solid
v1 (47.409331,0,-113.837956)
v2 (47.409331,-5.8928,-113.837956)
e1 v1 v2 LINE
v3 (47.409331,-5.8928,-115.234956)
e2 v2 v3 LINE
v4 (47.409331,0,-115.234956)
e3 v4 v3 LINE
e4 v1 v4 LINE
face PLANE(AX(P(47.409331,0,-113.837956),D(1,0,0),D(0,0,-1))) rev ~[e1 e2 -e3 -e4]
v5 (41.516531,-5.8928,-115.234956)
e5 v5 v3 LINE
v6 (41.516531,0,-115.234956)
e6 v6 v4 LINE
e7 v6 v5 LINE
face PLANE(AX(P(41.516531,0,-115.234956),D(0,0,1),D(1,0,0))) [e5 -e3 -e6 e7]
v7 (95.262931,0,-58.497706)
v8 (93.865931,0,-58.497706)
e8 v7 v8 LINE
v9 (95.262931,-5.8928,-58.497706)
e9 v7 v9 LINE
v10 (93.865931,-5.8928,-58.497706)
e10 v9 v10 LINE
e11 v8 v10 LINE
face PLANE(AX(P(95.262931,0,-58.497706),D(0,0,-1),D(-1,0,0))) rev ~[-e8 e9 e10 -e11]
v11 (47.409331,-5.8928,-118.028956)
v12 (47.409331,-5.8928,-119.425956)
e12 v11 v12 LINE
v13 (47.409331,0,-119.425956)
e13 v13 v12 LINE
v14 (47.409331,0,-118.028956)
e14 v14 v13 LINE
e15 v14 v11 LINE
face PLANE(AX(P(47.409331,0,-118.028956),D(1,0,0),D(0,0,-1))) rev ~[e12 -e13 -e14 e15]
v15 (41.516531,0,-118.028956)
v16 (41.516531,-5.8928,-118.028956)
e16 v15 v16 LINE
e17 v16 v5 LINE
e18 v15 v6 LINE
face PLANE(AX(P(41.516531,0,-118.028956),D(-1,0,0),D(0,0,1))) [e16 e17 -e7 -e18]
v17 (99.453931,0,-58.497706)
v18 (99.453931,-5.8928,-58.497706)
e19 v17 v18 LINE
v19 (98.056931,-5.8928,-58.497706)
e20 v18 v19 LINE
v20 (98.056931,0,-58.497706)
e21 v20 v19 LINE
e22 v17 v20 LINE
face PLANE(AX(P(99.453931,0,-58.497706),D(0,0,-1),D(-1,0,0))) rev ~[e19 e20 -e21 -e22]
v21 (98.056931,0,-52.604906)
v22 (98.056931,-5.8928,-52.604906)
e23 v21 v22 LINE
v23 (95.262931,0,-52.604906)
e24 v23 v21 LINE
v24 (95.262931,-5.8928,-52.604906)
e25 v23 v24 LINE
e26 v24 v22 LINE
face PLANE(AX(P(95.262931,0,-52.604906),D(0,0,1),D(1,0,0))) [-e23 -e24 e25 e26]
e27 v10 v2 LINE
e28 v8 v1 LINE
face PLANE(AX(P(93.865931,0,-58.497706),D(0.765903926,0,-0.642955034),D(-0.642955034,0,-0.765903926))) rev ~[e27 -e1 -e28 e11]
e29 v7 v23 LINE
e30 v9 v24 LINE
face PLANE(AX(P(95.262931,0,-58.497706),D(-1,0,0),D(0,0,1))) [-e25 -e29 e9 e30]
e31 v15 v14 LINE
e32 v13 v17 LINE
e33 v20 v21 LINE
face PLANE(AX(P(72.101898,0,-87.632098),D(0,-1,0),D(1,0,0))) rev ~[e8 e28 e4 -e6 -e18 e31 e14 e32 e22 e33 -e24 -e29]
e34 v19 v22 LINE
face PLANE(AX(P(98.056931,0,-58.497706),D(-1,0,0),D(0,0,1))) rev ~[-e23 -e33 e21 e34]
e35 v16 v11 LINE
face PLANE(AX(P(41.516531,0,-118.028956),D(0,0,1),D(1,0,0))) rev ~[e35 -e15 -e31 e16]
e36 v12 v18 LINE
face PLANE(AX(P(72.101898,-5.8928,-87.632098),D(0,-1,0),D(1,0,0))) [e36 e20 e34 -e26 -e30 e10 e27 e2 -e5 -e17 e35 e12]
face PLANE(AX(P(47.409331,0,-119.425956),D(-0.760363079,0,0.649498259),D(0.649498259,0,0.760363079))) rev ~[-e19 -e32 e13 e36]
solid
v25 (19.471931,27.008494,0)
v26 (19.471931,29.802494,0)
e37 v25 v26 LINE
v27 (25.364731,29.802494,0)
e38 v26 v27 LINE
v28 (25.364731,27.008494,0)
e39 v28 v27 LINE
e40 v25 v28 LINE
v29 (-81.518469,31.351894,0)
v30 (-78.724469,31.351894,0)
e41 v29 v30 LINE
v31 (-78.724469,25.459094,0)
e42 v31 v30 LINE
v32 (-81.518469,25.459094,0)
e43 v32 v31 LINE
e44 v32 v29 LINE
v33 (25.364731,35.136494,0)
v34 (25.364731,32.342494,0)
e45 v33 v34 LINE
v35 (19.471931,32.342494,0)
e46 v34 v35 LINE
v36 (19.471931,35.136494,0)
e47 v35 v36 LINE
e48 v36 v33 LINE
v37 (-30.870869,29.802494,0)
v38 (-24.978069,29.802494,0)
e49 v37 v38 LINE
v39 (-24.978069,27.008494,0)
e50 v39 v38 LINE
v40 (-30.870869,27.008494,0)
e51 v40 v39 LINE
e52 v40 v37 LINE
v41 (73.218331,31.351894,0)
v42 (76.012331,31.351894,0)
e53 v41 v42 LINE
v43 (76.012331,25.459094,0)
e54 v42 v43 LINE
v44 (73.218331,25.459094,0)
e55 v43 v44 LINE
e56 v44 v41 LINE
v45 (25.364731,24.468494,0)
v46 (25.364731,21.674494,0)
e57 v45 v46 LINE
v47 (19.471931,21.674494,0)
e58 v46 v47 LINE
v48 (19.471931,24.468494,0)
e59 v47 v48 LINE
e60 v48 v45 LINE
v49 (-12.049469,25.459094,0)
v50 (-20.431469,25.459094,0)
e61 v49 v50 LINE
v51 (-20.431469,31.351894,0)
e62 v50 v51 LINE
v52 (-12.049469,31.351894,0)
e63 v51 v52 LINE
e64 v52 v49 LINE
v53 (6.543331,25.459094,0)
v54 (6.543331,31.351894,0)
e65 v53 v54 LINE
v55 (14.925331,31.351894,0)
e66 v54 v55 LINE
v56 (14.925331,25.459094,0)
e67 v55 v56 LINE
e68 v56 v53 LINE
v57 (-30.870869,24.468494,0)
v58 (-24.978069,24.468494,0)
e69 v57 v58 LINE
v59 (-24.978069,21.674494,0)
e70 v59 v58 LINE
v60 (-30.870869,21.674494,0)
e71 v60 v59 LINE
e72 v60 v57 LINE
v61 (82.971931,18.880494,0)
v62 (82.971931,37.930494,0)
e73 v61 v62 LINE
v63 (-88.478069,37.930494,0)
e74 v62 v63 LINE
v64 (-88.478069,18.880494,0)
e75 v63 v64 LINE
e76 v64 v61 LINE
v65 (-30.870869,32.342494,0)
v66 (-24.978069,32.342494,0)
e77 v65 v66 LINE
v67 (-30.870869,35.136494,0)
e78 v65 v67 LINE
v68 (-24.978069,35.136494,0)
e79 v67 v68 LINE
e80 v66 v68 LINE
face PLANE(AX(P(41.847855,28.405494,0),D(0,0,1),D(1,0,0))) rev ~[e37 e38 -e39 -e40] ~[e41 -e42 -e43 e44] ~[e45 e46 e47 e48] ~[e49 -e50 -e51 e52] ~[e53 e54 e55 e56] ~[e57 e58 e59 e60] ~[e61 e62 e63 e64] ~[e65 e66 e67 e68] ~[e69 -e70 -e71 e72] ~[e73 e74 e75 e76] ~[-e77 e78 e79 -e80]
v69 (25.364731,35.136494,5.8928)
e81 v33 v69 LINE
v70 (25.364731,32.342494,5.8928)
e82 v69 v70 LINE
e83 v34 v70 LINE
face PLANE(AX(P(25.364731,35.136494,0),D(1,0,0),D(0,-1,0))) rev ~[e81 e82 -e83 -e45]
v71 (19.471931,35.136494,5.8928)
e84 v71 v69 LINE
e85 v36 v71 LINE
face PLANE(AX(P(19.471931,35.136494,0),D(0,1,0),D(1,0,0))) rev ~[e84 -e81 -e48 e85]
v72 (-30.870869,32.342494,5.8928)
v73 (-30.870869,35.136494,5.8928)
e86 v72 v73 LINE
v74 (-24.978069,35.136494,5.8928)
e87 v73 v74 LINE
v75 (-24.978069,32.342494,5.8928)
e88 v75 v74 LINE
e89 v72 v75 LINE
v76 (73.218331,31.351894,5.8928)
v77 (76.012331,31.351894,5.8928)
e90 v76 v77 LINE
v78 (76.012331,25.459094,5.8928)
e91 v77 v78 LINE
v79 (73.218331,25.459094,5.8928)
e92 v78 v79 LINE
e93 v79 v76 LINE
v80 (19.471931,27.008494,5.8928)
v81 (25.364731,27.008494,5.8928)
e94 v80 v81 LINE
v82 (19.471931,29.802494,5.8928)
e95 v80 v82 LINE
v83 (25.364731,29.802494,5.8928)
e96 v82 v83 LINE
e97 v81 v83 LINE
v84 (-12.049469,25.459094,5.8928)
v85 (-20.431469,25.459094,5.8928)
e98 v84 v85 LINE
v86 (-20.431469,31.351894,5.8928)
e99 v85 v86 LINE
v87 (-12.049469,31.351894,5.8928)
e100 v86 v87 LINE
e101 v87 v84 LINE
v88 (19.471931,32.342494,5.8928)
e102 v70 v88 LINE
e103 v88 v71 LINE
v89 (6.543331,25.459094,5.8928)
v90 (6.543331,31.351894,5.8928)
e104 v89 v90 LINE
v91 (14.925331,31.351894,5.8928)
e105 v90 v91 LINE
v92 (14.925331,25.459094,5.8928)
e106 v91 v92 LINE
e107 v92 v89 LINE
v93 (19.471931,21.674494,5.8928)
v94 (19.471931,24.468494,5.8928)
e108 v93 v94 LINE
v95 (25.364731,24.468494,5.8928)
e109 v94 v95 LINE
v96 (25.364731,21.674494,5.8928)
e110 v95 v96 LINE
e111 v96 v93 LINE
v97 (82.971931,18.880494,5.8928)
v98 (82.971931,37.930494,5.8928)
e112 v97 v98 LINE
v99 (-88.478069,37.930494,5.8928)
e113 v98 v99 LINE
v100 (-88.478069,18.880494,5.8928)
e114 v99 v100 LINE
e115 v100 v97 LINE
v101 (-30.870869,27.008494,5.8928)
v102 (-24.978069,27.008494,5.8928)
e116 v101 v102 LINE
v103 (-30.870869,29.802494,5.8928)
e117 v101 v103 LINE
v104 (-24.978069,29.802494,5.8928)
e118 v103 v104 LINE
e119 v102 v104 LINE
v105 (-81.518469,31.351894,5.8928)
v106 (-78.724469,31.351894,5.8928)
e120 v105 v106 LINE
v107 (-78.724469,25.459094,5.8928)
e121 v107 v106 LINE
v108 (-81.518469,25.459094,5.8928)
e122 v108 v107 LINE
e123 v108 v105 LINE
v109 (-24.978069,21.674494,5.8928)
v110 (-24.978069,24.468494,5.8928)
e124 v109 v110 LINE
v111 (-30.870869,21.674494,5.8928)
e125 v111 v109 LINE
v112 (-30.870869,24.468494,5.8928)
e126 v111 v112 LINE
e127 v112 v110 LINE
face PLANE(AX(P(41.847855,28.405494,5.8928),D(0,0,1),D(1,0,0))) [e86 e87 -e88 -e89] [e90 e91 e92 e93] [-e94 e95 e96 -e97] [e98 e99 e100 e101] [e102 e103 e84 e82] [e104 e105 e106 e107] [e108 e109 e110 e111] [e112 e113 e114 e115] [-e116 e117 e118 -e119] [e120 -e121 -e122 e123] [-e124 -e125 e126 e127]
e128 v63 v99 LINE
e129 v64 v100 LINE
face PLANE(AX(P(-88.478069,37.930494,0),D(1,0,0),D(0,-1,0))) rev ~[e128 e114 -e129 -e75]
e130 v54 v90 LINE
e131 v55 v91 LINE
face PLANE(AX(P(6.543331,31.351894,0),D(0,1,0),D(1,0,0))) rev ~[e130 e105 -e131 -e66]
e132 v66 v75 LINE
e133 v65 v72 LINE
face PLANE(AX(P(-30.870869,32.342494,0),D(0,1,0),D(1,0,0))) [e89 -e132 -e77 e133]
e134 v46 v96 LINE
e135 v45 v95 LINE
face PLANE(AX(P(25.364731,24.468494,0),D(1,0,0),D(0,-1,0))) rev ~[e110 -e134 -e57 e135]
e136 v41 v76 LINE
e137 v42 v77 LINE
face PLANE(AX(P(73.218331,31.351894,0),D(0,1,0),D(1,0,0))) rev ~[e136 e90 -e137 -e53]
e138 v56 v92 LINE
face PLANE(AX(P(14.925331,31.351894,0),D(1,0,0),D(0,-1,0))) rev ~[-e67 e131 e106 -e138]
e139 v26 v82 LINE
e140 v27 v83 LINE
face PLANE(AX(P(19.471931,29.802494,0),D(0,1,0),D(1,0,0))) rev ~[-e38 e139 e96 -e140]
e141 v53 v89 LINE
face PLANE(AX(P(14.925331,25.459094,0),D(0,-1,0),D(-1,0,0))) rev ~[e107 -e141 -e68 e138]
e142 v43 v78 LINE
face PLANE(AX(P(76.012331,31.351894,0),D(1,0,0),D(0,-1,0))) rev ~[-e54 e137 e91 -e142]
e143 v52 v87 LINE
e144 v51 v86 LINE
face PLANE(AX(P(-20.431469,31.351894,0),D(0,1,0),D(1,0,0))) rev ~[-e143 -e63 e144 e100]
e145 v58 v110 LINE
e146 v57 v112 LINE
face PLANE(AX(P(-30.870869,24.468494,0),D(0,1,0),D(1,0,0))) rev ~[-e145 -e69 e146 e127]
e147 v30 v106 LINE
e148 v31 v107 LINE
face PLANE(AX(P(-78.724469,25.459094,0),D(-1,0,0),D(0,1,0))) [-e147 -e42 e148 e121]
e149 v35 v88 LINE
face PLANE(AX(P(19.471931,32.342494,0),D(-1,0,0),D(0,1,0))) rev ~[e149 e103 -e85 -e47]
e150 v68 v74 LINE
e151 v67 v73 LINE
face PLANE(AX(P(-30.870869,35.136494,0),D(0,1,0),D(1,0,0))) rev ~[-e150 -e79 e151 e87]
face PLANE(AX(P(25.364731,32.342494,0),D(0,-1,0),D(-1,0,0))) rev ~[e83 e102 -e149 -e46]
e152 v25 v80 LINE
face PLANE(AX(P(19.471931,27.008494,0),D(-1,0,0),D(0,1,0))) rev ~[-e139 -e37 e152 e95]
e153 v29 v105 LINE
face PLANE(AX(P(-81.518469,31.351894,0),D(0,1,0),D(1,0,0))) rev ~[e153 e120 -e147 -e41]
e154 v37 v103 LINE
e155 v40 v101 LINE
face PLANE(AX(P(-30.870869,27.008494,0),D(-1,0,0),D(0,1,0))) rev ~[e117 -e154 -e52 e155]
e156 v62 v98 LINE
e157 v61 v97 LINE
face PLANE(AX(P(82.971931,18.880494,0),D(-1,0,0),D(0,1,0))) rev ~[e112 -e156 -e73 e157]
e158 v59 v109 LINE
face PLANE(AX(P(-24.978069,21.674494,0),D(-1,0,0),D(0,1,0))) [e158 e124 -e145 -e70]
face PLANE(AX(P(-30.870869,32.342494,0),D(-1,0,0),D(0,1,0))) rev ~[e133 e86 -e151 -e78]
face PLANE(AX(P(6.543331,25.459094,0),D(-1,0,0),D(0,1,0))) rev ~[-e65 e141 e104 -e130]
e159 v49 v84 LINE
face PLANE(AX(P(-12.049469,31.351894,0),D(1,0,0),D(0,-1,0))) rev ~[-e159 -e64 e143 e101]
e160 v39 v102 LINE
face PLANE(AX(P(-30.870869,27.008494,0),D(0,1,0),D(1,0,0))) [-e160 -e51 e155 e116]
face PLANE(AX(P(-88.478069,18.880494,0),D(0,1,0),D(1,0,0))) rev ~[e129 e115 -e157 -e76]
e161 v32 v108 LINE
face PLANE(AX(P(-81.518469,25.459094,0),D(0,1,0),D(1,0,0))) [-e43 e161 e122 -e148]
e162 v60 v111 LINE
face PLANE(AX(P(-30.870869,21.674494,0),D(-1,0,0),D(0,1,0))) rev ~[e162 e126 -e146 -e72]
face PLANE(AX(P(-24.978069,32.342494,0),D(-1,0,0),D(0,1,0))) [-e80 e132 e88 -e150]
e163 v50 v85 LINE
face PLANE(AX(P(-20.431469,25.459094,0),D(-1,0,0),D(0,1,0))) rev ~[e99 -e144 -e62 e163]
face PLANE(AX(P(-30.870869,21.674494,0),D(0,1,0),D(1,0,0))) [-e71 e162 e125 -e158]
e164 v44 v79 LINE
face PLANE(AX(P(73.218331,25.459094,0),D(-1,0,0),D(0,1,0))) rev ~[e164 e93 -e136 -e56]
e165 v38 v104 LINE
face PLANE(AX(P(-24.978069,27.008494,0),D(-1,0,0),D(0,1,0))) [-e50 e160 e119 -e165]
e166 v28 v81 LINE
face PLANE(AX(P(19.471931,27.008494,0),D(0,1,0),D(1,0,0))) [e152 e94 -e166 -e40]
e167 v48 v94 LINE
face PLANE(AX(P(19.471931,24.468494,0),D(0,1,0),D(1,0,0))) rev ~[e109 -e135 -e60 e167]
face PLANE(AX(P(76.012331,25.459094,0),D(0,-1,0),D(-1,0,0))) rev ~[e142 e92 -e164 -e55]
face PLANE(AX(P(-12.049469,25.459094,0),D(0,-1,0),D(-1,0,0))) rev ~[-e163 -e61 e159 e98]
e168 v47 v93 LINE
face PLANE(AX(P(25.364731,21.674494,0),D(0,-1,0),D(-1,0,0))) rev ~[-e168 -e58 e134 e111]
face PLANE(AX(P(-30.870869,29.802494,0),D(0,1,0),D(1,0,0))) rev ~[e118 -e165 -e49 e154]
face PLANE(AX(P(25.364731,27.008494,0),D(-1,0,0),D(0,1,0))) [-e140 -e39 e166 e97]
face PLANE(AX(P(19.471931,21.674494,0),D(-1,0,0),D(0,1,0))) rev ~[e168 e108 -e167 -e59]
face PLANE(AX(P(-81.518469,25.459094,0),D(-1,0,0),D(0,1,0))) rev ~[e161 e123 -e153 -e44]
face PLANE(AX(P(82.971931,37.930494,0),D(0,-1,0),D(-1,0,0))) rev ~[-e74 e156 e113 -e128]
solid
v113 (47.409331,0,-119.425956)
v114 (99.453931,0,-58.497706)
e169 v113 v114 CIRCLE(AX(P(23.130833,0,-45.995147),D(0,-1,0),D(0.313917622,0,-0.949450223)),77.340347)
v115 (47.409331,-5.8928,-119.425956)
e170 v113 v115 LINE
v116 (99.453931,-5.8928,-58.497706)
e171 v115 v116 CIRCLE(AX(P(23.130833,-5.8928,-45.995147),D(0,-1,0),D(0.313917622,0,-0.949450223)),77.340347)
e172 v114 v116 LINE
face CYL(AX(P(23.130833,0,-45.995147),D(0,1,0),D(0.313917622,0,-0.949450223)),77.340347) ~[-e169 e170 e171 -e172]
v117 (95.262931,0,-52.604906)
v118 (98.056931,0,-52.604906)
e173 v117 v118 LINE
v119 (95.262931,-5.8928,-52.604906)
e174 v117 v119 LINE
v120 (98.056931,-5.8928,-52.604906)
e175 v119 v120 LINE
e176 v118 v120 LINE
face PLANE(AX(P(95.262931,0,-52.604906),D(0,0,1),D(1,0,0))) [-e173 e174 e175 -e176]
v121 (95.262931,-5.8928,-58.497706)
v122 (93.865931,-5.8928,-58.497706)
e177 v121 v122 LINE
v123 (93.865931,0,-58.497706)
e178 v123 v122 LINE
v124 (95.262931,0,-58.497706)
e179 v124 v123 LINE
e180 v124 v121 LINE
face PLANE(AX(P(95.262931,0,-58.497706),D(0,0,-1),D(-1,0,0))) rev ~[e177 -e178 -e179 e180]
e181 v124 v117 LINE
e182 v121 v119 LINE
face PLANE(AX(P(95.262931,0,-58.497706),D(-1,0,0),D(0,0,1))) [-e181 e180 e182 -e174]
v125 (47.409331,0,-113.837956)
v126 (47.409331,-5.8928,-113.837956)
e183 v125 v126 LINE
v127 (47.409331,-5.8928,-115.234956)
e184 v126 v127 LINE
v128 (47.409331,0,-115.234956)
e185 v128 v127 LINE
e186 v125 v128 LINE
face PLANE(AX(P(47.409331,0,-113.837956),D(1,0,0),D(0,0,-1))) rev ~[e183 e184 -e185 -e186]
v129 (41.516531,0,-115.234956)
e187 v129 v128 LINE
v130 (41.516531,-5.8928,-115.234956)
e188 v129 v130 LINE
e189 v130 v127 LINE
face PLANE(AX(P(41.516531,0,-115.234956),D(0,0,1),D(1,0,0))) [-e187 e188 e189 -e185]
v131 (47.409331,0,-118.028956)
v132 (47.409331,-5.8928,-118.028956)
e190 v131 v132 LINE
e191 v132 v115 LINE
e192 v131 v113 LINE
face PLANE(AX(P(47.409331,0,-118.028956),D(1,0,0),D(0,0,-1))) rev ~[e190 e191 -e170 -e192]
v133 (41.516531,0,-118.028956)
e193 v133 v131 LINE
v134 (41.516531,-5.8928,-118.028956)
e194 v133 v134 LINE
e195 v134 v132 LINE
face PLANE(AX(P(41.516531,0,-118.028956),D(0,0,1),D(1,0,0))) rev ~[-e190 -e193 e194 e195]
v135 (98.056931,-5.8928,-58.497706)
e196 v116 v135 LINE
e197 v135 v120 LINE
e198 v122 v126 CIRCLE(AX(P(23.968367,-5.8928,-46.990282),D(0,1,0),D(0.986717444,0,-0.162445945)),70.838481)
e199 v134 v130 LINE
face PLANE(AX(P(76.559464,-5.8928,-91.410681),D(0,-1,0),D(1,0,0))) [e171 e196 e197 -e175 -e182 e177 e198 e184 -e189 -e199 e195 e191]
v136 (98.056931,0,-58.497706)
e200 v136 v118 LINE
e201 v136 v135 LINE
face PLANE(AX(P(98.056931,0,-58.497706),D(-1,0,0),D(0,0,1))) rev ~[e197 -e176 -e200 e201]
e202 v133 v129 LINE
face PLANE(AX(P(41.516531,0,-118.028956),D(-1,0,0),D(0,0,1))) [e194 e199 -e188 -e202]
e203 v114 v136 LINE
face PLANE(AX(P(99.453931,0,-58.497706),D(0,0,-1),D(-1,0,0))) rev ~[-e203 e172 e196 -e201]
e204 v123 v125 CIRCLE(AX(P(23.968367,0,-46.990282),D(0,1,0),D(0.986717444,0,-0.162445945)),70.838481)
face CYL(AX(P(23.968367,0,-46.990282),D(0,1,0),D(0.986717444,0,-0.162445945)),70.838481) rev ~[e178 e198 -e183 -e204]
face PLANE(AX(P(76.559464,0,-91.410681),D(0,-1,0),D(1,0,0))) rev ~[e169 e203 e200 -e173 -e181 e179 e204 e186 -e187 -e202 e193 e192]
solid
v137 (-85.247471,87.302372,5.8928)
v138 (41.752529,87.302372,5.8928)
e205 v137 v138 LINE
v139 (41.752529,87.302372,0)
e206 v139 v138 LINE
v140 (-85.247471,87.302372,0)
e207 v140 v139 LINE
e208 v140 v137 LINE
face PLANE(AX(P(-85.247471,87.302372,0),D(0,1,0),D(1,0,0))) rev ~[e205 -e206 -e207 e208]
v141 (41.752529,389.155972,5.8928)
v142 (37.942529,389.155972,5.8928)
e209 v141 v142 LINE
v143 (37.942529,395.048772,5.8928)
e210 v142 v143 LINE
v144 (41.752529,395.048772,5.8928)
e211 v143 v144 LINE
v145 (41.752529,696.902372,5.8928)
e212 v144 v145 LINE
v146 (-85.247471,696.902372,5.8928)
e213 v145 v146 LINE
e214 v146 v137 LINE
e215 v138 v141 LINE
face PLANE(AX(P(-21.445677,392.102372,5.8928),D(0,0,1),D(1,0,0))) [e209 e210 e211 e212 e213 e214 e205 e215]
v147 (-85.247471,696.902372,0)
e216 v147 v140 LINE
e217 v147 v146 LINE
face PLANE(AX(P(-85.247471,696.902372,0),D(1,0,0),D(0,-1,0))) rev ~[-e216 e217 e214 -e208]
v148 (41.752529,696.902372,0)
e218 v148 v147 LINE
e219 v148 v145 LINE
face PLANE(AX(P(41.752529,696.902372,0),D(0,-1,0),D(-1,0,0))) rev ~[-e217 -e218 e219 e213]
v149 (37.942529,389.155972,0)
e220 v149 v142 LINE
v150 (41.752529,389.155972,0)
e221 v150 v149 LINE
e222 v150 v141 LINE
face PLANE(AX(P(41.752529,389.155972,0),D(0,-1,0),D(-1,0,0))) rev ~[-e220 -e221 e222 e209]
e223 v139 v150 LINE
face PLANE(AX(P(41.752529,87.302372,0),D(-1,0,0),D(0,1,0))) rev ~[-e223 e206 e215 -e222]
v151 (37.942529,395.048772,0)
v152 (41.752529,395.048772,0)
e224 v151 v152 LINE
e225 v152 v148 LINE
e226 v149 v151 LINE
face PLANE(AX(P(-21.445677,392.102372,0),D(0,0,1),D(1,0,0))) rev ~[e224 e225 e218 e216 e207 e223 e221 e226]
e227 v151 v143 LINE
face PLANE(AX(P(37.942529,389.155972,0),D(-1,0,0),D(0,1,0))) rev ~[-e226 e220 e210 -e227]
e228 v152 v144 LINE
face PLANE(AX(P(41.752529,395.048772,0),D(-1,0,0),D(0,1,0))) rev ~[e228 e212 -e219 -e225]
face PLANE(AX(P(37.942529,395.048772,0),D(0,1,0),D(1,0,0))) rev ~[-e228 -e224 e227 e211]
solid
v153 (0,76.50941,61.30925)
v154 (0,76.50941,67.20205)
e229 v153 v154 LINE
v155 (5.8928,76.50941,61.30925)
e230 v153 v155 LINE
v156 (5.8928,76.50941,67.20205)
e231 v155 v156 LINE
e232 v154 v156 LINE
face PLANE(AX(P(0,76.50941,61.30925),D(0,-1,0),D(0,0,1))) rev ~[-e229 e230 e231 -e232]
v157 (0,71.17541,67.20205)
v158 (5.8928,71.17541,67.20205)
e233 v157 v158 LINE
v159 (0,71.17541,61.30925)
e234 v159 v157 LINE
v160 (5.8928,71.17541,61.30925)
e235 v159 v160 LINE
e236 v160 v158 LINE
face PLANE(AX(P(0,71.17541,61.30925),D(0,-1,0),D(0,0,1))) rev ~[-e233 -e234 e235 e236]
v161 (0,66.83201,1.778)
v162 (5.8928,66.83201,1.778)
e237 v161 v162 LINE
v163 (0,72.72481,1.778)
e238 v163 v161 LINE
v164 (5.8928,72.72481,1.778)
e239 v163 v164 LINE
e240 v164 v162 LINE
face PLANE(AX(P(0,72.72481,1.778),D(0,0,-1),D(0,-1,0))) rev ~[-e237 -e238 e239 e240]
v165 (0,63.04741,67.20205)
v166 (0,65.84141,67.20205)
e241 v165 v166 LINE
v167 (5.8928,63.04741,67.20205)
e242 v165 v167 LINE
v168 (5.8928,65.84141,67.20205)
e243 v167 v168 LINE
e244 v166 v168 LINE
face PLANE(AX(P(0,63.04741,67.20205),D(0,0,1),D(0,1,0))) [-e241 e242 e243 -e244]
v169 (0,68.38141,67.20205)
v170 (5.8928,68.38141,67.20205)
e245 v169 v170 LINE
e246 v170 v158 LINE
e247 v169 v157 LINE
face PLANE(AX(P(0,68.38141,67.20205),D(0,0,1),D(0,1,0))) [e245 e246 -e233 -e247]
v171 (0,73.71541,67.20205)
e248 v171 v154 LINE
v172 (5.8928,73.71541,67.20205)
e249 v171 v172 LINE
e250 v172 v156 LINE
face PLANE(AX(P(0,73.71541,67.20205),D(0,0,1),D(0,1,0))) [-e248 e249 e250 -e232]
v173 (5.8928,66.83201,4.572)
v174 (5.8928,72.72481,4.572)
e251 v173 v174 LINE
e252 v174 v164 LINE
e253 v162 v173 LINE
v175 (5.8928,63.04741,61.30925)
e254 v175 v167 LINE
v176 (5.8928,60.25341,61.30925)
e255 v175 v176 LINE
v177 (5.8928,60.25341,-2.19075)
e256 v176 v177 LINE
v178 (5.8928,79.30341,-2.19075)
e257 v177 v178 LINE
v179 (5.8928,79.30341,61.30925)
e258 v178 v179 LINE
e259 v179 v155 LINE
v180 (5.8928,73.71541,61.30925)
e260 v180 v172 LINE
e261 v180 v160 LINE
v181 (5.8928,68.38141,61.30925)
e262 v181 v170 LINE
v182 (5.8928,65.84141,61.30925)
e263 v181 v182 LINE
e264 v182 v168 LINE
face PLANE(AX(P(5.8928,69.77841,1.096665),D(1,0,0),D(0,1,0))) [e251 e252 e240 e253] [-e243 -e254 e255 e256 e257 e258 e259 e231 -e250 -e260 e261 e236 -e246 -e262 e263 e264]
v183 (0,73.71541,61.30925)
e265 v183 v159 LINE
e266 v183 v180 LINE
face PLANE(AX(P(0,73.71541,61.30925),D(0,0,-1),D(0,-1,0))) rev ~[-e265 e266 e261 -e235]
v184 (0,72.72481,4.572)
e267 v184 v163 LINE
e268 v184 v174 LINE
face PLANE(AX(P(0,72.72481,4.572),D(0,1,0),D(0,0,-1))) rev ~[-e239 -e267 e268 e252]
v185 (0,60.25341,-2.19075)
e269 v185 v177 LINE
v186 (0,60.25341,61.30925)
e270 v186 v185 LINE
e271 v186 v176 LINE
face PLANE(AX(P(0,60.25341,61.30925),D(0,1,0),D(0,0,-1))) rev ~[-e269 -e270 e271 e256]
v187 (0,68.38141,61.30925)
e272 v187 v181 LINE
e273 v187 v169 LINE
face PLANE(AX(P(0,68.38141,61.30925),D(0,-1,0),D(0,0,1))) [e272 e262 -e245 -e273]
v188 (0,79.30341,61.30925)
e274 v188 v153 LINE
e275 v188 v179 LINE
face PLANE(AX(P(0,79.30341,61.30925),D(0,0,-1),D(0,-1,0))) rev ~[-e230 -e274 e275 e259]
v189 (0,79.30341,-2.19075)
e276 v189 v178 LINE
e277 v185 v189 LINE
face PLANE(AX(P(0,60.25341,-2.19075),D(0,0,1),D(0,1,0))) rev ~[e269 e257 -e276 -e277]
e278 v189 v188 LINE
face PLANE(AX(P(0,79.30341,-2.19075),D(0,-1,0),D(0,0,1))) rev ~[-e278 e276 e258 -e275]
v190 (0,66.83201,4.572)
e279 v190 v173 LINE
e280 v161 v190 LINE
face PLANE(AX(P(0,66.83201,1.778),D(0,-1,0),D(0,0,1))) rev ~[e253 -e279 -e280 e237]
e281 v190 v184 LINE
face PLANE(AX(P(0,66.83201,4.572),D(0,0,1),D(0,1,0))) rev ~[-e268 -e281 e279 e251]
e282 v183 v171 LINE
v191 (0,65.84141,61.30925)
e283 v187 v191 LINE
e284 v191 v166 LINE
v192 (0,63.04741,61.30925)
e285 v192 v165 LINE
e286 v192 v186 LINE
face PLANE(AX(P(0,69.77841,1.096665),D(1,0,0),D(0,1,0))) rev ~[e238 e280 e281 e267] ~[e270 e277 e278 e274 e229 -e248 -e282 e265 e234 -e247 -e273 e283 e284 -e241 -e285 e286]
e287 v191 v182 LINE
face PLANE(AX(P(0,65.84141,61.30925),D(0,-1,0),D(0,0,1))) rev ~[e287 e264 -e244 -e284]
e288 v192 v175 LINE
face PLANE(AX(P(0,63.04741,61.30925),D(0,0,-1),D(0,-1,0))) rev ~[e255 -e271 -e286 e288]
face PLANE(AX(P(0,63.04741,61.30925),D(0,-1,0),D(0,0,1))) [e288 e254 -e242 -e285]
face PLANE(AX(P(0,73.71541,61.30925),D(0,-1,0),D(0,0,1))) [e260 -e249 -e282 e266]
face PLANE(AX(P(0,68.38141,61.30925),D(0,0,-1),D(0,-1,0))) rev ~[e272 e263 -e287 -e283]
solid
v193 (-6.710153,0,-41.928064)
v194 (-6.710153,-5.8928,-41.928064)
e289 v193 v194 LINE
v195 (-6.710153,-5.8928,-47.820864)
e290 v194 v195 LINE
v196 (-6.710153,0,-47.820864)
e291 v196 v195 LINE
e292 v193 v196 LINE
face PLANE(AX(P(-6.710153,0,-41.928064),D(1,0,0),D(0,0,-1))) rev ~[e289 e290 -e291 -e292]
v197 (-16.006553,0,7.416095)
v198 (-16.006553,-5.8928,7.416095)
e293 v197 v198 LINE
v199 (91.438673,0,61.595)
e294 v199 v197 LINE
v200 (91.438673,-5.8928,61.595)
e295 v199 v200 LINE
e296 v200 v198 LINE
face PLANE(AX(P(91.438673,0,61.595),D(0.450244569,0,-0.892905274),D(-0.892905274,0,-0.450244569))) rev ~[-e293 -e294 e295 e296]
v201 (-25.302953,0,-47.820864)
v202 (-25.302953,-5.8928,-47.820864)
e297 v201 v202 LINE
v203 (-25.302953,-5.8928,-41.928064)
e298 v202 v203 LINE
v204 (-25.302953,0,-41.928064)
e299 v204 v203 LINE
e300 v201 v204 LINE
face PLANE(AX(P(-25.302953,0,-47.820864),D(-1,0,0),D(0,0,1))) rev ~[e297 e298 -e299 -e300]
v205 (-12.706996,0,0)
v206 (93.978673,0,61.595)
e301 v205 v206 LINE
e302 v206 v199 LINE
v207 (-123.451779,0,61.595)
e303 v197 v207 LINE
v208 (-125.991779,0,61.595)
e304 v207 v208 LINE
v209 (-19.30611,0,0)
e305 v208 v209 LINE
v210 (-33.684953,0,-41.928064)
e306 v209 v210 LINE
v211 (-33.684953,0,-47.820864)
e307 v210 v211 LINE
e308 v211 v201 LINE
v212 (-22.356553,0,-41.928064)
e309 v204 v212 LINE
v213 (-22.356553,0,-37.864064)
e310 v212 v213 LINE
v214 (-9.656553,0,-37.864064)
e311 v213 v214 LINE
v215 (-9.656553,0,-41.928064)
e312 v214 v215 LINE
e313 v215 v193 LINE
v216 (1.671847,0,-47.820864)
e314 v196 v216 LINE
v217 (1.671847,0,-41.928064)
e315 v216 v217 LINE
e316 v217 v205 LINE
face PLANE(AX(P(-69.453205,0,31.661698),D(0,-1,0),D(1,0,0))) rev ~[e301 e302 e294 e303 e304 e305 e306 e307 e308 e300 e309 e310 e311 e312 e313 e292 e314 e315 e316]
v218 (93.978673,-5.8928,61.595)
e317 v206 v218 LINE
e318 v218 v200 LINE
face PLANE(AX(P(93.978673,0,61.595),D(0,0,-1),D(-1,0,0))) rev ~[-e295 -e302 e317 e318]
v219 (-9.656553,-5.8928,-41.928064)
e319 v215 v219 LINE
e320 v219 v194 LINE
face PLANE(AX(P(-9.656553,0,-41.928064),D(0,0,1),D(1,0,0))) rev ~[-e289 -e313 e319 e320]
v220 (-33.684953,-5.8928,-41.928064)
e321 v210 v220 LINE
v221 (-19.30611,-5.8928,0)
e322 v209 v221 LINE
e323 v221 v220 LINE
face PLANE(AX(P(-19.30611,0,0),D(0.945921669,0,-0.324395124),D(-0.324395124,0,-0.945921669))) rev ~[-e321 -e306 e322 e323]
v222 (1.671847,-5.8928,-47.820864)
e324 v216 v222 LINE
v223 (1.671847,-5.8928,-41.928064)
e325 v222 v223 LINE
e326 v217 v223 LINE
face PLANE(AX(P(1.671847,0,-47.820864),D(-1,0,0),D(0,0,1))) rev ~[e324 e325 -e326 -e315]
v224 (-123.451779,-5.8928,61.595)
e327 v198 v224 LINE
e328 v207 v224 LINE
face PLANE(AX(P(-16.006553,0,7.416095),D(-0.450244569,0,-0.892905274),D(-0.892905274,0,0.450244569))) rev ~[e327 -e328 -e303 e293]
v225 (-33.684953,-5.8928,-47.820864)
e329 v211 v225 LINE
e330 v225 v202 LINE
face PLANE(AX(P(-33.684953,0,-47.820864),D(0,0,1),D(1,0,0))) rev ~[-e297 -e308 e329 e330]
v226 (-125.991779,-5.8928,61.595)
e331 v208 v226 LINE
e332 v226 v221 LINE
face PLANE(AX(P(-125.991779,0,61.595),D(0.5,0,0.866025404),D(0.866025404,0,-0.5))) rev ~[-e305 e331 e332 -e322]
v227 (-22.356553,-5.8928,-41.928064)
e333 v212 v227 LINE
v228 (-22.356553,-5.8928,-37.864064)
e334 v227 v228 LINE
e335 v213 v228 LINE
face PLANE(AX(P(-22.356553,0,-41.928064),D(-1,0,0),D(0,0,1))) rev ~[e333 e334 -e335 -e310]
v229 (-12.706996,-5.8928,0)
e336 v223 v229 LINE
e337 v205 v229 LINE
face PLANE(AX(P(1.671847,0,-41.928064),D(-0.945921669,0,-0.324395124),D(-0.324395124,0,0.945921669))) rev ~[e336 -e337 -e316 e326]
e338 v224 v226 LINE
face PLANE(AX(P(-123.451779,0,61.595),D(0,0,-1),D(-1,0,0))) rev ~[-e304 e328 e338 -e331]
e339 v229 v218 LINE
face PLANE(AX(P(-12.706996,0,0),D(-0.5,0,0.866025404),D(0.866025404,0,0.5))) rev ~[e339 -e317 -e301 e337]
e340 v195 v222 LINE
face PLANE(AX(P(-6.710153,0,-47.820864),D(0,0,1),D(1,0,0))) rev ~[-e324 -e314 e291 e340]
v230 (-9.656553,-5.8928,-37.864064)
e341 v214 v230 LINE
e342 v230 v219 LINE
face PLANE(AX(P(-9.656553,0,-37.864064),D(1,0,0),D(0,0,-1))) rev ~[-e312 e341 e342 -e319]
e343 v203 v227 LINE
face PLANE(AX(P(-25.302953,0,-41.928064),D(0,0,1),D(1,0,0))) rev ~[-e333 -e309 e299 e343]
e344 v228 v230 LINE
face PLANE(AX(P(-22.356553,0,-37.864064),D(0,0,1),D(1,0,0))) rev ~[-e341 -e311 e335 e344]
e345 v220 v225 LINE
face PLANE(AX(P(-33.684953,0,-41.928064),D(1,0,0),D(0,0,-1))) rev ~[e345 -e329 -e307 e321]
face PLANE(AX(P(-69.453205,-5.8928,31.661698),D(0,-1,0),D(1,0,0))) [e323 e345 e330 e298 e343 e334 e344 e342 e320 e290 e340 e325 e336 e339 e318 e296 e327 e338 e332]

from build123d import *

# Parameters (mm, degrees)
F1_W      = 5.8928
F1_H      = 2.794
F1_W_2    = 2.794
F1_H_2    = 5.8928
F2_DEPTH  = 5.8928
F3_W      = 2.794
F3_H      = 12.9595901101
F3_W_2    = 2.54
F3_H_2    = 5.8928
F4_DEPTH  = 5.8928
F5_W      = 2.794
F5_H      = 5.8928
F5_W_2    = 5.8928
F5_H_2    = 2.794
F6_DEPTH  = 5.8928
F7_W      = 2.794
F7_H      = 5.8928
F7_W_2    = 5.8928
F7_H_2    = 2.794
F8_DEPTH  = 5.8928
F10_DEPTH = 5.8928
F13_DEPTH = 5.8928


# Not quite as in the source:
# - a variable given as a bare number and used for a length is read in inches; the dataset says mm whatever the document's units were


with BuildPart() as f2:
    # F1 (on Top) → F2 (new body)
    with BuildSketch(Plane.XY):
        Polygon((22.4183307789, 37.9304943726), (10.7343307789, 37.9304943726), (10.7343307789, 31.3518943726), (14.9253307789, 31.3518943726), (14.9253307789, 25.4590943726), (10.7343307789, 25.4590943726), (10.7343307789, 18.8804943726), (22.4183307789, 18.8804943726), (74.6153307789, 18.8804943726), (74.6153307789, 25.4590943726), (73.2183307789, 25.4590943726), (73.2183307789, 31.3518943726), (74.6153307789, 31.3518943726), (74.6153307789, 37.9304943726), align=None)
        Polygon((25.3647307789, 21.6744943726), (22.4183307789, 21.6744943726), (19.4719307789, 21.6744943726), (19.4719307789, 24.4684943726), (25.3647307789, 24.4684943726), align=None, mode=Mode.SUBTRACT)
        with Locations((22.4183307789, 28.4054943726)):
            Rectangle(F1_W, F1_H, mode=Mode.SUBTRACT)
        Polygon((19.4719307789, 35.1364943726), (22.4183307789, 35.1364943726), (25.3647307789, 35.1364943726), (25.3647307789, 32.3424943726), (19.4719307789, 32.3424943726), align=None, mode=Mode.SUBTRACT)
        Polygon((-2.7530692211, 37.9304943726), (-88.4780692211, 37.9304943726), (-88.4780692211, 18.8804943726), (-2.7530692211, 18.8804943726), (-2.7530692211, 28.4054943726), align=None)
        with Locations((-27.9244692211, 23.0714943726)):
            Rectangle(F1_W, F1_H, mode=Mode.SUBTRACT)
        with Locations((-80.1214692211, 28.4054943726)):
            Rectangle(F1_W_2, F1_H_2, mode=Mode.SUBTRACT)
        with Locations((-27.9244692211, 28.4054943726)):
            Rectangle(F1_W, F1_H, mode=Mode.SUBTRACT)
        Polygon((-12.0494692211, 31.3518943726), (-12.0494692211, 28.4054943726), (-12.0494692211, 25.4590943726), (-20.4314692211, 25.4590943726), (-20.4314692211, 31.3518943726), align=None, mode=Mode.SUBTRACT)
        with Locations((-27.9244692211, 33.7394943726)):
            Rectangle(F1_W, F1_H, mode=Mode.SUBTRACT)
        Polygon((82.9719307789, 37.9304943726), (74.6153307789, 37.9304943726), (74.6153307789, 31.3518943726), (76.0123307789, 31.3518943726), (76.0123307789, 25.4590943726), (74.6153307789, 25.4590943726), (74.6153307789, 18.8804943726), (82.9719307789, 18.8804943726), align=None)
        Polygon((10.7343307789, 37.9304943726), (-2.7530692211, 37.9304943726), (-2.7530692211, 28.4054943726), (6.5433307789, 28.4054943726), (6.5433307789, 31.3518943726), (10.7343307789, 31.3518943726), align=None)
        Polygon((6.5433307789, 28.4054943726), (-2.7530692211, 28.4054943726), (-2.7530692211, 18.8804943726), (10.7343307789, 18.8804943726), (10.7343307789, 25.4590943726), (6.5433307789, 25.4590943726), align=None)
    extrude(amount=F2_DEPTH)


with BuildPart() as f4:
    # F3 (on Right) → F4 (new body)
    with BuildSketch(Plane.YZ):
        Polygon((60.25341, -2.19075), (79.30341, -2.19075), (79.30341, 4.572), (72.72481, 4.572), (72.72481, 1.778), (66.83201, 1.778), (66.83201, 4.572), (60.25341, 4.572), align=None)
        Polygon((72.72481, 4.572), (79.30341, 4.572), (79.30341, 48.3496598899), (76.50941, 48.3496598899), (73.71541, 48.3496598899), (71.17541, 48.3496598899), (68.38141, 48.3496598899), (65.84141, 48.3496598899), (63.04741, 48.3496598899), (60.25341, 48.3496598899), (60.25341, 4.572), (66.83201, 4.572), align=None)
        Polygon((76.50941, 48.3496598899), (79.30341, 48.3496598899), (79.30341, 54.61), (79.30341, 61.30925), (76.50941, 61.30925), align=None)
        with Locations((61.65041, 54.829454945)):
            Rectangle(F3_W, F3_H)
        with Locations((75.11241, 54.829454945)):
            Rectangle(F3_W, F3_H)
        with Locations((64.44441, 54.829454945)):
            Rectangle(F3_W, F3_H)
        with Locations((72.44541, 54.829454945)):
            Rectangle(F3_W_2, F3_H)
        with Locations((75.11241, 64.25565)):
            Rectangle(F3_W, F3_H_2)
        with Locations((64.44441, 64.25565)):
            Rectangle(F3_W, F3_H_2)
        with Locations((67.11141, 54.829454945)):
            Rectangle(F3_W_2, F3_H)
        with Locations((69.77841, 54.829454945)):
            Rectangle(F3_W, F3_H)
        with Locations((69.77841, 64.25565)):
            Rectangle(F3_W, F3_H_2)
    extrude(amount=F4_DEPTH)


with BuildPart() as f6:
    # F5 (on Front) → F6 (new body)
    with BuildSketch(Plane.XZ):
        with BuildLine():
            Line((95.2629311906, -58.4977063152), (93.8659311906, -58.4977063152))
            ThreePointArc((93.8659311906, -58.4977063152), (78.2238370796, -92.5362400683), (47.4093311906, -113.8379563152))
            Line((47.4093311906, -113.8379563152), (47.4093311906, -115.2349563152))
            Line((47.4093311906, -115.2349563152), (47.4093311906, -118.0289563152))
            Line((47.4093311906, -118.0289563152), (47.4093311906, -119.4259563152))
            ThreePointArc((47.4093311906, -119.4259563152), (81.937577657, -96.2275673485), (99.4539311906, -58.4977063152))
            Line((99.4539311906, -58.4977063152), (98.0569311906, -58.4977063152))
            Line((98.0569311906, -58.4977063152), (95.2629311906, -58.4977063152))
        make_face()
        with Locations((96.6599311906, -55.5513063152)):
            Rectangle(F5_W, F5_H)
        with Locations((44.4629311906, -116.6319563152)):
            Rectangle(F5_W_2, F5_H_2)
    extrude(amount=F6_DEPTH)


with BuildPart() as f8:
    # F7 (on Front) → F8 (new body)
    with BuildSketch(Plane.XZ):
        Polygon((98.0569311906, -58.4977063152), (95.2629311906, -58.4977063152), (93.8659311906, -58.4977063152), (47.4093311906, -113.8379563152), (47.4093311906, -115.2349563152), (47.4093311906, -118.0289563152), (47.4093311906, -119.4259563152), (99.4539311906, -58.4977063152), align=None)
        with Locations((96.6599311906, -55.5513063152)):
            Rectangle(F7_W, F7_H)
        with Locations((44.4629311906, -116.6319563152)):
            Rectangle(F7_W_2, F7_H_2)
    extrude(amount=F8_DEPTH)


with BuildPart() as f10:
    # F9 (on Front) → F10 (new body)
    with BuildSketch(Plane.XZ):
        Polygon((-123.4517790751, 61.595), (-125.9917790751, 61.595), (-19.3061095829, 0), (-16.0065527945, 0), (-16.0065527945, 7.4160954057), align=None)
        Polygon((-16.0065527945, -1.905), (-19.3061095829, 0), (-33.6849527945, -41.9280635703), (-33.6849527945, -47.8208635703), (-25.3029527945, -47.8208635703), (-25.3029527945, -41.9280635703), (-22.3565527945, -41.9280635703), (-22.3565527945, -37.8640635703), (-16.0065527945, -37.8640635703), align=None)
        Polygon((-16.0065527945, 0), (-19.3061095829, 0), (-16.0065527945, -1.905), align=None)
        Polygon((91.4386734861, 61.595), (-16.0065527945, 7.4160954057), (-16.0065527945, 0), (-12.7069960061, 0), (93.9786734861, 61.595), align=None)
        Polygon((-12.7069960061, 0), (-16.0065527945, 0), (-16.0065527945, -1.905), align=None)
        Polygon((-12.7069960061, 0), (-16.0065527945, -1.905), (-16.0065527945, -37.8640635703), (-9.6565527945, -37.8640635703), (-9.6565527945, -41.9280635703), (-6.7101527945, -41.9280635703), (-6.7101527945, -47.8208635703), (1.6718472055, -47.8208635703), (1.6718472055, -41.9280635703), align=None)
    extrude(amount=F10_DEPTH)


with BuildPart() as f13:
    # F12 (on Top) → F13 (new body)
    with BuildSketch(Plane.XY):
        Polygon((41.7525291319, 696.9023720026), (-85.2474708681, 696.9023720026), (-85.2474708681, 87.3023720026), (41.7525291319, 87.3023720026), (41.7525291319, 389.1559720026), (37.9425291319, 389.1559720026), (37.9425291319, 395.0487720026), (41.7525291319, 395.0487720026), align=None)
    extrude(amount=F13_DEPTH)


solid = Compound([f2.part, f4.part, f6.part, f8.part, f10.part, f13.part])
